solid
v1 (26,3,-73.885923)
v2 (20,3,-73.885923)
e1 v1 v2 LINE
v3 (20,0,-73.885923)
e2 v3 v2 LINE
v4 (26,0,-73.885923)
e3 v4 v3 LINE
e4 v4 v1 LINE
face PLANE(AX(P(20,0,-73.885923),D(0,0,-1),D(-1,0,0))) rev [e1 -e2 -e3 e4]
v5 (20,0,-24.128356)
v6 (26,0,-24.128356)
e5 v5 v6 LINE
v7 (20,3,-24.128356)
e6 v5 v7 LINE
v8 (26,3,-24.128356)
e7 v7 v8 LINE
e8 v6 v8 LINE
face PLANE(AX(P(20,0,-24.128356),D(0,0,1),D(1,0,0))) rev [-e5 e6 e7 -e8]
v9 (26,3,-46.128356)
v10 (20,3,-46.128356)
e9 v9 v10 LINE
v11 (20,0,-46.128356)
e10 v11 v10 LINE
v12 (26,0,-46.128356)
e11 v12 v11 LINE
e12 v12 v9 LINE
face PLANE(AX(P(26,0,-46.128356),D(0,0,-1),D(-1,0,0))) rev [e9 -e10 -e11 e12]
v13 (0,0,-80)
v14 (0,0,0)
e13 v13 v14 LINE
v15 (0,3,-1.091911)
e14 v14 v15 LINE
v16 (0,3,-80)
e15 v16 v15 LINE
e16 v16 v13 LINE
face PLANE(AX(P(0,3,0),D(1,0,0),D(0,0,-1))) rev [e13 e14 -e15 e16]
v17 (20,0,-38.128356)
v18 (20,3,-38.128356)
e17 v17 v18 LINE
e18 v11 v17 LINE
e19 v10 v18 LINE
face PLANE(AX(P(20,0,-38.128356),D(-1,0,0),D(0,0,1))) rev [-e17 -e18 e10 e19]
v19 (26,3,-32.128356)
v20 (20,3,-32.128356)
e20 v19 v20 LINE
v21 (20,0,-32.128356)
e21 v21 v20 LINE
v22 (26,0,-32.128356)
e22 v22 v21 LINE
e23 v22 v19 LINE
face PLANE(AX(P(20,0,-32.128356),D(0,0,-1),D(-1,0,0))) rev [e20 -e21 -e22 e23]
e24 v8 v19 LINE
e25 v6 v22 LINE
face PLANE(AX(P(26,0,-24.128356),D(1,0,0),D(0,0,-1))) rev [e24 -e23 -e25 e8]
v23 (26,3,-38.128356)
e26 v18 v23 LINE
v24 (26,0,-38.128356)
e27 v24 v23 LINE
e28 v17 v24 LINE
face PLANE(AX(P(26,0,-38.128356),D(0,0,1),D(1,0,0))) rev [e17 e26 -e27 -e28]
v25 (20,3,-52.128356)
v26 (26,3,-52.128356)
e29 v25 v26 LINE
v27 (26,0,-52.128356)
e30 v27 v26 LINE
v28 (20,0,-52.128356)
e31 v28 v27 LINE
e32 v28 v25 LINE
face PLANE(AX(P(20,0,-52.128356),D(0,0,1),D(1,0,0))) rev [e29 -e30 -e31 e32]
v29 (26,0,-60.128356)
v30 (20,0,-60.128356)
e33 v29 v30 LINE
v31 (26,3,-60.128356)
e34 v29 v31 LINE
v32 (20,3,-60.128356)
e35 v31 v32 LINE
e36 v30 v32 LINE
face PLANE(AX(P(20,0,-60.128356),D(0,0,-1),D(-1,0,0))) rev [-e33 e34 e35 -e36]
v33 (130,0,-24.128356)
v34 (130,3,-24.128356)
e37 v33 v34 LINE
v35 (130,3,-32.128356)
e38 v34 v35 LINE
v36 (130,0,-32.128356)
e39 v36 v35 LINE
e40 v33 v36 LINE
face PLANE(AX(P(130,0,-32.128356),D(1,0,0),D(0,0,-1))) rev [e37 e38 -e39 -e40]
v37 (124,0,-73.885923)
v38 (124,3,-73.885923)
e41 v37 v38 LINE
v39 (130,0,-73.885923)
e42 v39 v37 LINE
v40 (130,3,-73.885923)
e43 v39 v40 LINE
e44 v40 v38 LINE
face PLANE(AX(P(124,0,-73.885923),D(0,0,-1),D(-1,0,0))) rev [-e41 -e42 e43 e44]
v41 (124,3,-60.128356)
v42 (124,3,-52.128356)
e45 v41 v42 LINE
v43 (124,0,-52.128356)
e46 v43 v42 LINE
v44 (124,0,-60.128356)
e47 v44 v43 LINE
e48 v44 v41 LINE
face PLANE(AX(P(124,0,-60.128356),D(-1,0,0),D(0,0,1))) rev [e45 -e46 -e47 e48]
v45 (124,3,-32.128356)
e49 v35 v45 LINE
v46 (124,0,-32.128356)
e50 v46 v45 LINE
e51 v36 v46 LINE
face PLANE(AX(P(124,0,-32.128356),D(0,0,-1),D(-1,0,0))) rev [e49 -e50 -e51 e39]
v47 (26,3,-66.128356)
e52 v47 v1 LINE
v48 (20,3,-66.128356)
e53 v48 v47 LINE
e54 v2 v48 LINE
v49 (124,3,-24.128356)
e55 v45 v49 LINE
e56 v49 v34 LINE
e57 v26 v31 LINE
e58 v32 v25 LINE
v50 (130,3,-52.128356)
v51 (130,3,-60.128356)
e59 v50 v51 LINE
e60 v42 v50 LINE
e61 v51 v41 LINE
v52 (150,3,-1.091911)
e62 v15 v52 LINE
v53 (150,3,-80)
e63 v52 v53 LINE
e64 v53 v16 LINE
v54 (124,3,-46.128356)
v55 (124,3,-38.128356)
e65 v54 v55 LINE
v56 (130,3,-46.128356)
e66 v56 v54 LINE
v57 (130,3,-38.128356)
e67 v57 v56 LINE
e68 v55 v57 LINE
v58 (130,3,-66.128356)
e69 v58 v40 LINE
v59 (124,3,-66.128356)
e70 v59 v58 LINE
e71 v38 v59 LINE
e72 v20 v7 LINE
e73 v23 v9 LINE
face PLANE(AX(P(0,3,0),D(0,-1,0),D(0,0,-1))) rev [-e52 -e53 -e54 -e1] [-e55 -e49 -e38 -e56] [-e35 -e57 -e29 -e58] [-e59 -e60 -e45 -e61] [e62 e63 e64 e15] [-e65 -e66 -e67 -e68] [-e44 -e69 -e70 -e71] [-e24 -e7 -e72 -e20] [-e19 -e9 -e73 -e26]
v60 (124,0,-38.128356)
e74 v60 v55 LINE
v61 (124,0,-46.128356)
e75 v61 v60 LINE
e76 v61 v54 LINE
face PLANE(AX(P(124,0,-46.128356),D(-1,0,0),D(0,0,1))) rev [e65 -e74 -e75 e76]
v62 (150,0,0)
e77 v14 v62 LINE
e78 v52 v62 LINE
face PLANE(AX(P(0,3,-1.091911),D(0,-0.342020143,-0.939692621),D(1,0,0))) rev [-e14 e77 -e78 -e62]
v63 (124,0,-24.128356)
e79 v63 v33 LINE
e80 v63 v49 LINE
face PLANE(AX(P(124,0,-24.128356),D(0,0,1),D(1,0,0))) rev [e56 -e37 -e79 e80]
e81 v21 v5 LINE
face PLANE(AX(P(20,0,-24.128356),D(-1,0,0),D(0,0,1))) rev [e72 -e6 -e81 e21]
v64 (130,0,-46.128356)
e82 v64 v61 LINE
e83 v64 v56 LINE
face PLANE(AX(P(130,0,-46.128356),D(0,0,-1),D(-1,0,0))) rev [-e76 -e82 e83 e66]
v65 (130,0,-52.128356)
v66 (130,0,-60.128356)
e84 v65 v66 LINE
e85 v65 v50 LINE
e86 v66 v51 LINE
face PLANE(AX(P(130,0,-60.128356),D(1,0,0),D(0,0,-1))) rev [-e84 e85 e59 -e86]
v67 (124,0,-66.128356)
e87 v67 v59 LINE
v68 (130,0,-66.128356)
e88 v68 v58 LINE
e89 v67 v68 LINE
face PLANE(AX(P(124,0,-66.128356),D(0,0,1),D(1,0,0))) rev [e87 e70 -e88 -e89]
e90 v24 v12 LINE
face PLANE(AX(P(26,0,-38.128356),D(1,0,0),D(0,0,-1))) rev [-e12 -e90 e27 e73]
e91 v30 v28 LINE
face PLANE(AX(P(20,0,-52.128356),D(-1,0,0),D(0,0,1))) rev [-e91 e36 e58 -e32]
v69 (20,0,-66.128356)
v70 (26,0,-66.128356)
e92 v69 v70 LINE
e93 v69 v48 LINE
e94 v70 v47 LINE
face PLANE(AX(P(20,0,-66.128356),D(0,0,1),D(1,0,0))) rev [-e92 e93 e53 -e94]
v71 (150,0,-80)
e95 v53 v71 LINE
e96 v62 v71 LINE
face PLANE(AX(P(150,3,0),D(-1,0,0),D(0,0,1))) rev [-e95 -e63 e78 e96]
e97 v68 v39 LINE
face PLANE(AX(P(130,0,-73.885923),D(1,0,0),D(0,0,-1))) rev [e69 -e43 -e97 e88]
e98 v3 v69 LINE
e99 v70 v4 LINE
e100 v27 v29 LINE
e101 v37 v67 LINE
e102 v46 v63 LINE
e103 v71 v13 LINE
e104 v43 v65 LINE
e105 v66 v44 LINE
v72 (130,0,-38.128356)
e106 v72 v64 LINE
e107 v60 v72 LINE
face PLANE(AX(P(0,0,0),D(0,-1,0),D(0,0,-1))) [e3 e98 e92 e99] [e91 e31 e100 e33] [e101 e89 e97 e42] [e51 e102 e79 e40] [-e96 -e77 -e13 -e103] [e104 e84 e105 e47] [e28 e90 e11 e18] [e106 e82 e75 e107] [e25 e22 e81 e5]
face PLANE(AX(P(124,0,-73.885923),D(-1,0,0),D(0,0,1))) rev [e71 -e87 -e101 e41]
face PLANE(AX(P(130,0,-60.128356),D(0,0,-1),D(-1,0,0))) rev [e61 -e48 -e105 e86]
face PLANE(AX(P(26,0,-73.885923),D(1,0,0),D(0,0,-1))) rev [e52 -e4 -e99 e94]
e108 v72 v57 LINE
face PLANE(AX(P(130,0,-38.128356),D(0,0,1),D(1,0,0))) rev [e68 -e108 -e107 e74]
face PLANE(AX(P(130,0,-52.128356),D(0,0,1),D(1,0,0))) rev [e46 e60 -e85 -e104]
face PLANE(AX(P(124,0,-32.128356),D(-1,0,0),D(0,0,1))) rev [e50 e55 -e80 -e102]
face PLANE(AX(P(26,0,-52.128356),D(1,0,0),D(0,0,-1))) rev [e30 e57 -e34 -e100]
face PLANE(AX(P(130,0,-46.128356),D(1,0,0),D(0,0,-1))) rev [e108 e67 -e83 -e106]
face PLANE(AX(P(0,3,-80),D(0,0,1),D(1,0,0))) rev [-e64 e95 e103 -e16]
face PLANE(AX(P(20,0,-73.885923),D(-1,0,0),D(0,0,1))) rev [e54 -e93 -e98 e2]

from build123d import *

# Parameters (mm, degrees)
ESQUISSE1_W             = 150
ESQUISSE1_H             = 80
BOSS_EXTRU_1_DEPTH      = 3
CHANFREIN2_SIZE2        = 1.091910703
CHANFREIN2_SIZE         = 3
ESQUISSE2_W             = 6
ESQUISSE2_H             = 7.757567742
ESQUISSE2_H_2           = 8
ENL_V_MAT_EXTRU_1_DEPTH = 3


with BuildPart() as part:
    # Esquisse1 → Boss.-Extru.1 (new body)
    with BuildSketch(Plane(origin=(0, 0, 0), x_dir=(1, 0, 0), z_dir=(0, 1, 0))):
        with Locations((75, 40)):
            Rectangle(ESQUISSE1_W, ESQUISSE1_H)
    extrude(amount=BOSS_EXTRU_1_DEPTH)

    # Chanfrein2
    chanfrein2_edges = [part.edges().sort_by_distance(p)[0] for p in [
        (75, 3, 0),
    ]]
    chanfrein2_side = [part.faces().sort_by_distance(p)[0] for p in [
        (75, 2.978161786, 0),
    ]]
    chamfer(chanfrein2_edges, length=CHANFREIN2_SIZE - 0.0001, length2=CHANFREIN2_SIZE2 - 0.0001, reference=chanfrein2_side[0])  # a hair under: the kernel refuses the full size

    # Esquisse2 → Enlèv. mat.-Extru.1 (cut)
    with BuildSketch(Plane(origin=(0, 3, 0), x_dir=(1, 0, 0), z_dir=(0, 1, 0))):
        with Locations((127, 70.007139416)):
            Rectangle(ESQUISSE2_W, ESQUISSE2_H)
        with Locations((127, 56.128355545)):
            Rectangle(ESQUISSE2_W, ESQUISSE2_H_2)
        with Locations((127, 42.128355545)):
            Rectangle(ESQUISSE2_W, ESQUISSE2_H_2)
        with Locations((127, 28.128355545)):
            Rectangle(ESQUISSE2_W, ESQUISSE2_H_2)
        with Locations((23, 28.128355545)):
            Rectangle(ESQUISSE2_W, ESQUISSE2_H_2)
        with Locations((23, 42.128355545)):
            Rectangle(ESQUISSE2_W, ESQUISSE2_H_2)
        with Locations((23, 56.128355545)):
            Rectangle(ESQUISSE2_W, ESQUISSE2_H_2)
        with Locations((23, 70.007139416)):
            Rectangle(ESQUISSE2_W, ESQUISSE2_H)
    extrude(amount=-ENL_V_MAT_EXTRU_1_DEPTH, mode=Mode.SUBTRACT)


solid = part.part
